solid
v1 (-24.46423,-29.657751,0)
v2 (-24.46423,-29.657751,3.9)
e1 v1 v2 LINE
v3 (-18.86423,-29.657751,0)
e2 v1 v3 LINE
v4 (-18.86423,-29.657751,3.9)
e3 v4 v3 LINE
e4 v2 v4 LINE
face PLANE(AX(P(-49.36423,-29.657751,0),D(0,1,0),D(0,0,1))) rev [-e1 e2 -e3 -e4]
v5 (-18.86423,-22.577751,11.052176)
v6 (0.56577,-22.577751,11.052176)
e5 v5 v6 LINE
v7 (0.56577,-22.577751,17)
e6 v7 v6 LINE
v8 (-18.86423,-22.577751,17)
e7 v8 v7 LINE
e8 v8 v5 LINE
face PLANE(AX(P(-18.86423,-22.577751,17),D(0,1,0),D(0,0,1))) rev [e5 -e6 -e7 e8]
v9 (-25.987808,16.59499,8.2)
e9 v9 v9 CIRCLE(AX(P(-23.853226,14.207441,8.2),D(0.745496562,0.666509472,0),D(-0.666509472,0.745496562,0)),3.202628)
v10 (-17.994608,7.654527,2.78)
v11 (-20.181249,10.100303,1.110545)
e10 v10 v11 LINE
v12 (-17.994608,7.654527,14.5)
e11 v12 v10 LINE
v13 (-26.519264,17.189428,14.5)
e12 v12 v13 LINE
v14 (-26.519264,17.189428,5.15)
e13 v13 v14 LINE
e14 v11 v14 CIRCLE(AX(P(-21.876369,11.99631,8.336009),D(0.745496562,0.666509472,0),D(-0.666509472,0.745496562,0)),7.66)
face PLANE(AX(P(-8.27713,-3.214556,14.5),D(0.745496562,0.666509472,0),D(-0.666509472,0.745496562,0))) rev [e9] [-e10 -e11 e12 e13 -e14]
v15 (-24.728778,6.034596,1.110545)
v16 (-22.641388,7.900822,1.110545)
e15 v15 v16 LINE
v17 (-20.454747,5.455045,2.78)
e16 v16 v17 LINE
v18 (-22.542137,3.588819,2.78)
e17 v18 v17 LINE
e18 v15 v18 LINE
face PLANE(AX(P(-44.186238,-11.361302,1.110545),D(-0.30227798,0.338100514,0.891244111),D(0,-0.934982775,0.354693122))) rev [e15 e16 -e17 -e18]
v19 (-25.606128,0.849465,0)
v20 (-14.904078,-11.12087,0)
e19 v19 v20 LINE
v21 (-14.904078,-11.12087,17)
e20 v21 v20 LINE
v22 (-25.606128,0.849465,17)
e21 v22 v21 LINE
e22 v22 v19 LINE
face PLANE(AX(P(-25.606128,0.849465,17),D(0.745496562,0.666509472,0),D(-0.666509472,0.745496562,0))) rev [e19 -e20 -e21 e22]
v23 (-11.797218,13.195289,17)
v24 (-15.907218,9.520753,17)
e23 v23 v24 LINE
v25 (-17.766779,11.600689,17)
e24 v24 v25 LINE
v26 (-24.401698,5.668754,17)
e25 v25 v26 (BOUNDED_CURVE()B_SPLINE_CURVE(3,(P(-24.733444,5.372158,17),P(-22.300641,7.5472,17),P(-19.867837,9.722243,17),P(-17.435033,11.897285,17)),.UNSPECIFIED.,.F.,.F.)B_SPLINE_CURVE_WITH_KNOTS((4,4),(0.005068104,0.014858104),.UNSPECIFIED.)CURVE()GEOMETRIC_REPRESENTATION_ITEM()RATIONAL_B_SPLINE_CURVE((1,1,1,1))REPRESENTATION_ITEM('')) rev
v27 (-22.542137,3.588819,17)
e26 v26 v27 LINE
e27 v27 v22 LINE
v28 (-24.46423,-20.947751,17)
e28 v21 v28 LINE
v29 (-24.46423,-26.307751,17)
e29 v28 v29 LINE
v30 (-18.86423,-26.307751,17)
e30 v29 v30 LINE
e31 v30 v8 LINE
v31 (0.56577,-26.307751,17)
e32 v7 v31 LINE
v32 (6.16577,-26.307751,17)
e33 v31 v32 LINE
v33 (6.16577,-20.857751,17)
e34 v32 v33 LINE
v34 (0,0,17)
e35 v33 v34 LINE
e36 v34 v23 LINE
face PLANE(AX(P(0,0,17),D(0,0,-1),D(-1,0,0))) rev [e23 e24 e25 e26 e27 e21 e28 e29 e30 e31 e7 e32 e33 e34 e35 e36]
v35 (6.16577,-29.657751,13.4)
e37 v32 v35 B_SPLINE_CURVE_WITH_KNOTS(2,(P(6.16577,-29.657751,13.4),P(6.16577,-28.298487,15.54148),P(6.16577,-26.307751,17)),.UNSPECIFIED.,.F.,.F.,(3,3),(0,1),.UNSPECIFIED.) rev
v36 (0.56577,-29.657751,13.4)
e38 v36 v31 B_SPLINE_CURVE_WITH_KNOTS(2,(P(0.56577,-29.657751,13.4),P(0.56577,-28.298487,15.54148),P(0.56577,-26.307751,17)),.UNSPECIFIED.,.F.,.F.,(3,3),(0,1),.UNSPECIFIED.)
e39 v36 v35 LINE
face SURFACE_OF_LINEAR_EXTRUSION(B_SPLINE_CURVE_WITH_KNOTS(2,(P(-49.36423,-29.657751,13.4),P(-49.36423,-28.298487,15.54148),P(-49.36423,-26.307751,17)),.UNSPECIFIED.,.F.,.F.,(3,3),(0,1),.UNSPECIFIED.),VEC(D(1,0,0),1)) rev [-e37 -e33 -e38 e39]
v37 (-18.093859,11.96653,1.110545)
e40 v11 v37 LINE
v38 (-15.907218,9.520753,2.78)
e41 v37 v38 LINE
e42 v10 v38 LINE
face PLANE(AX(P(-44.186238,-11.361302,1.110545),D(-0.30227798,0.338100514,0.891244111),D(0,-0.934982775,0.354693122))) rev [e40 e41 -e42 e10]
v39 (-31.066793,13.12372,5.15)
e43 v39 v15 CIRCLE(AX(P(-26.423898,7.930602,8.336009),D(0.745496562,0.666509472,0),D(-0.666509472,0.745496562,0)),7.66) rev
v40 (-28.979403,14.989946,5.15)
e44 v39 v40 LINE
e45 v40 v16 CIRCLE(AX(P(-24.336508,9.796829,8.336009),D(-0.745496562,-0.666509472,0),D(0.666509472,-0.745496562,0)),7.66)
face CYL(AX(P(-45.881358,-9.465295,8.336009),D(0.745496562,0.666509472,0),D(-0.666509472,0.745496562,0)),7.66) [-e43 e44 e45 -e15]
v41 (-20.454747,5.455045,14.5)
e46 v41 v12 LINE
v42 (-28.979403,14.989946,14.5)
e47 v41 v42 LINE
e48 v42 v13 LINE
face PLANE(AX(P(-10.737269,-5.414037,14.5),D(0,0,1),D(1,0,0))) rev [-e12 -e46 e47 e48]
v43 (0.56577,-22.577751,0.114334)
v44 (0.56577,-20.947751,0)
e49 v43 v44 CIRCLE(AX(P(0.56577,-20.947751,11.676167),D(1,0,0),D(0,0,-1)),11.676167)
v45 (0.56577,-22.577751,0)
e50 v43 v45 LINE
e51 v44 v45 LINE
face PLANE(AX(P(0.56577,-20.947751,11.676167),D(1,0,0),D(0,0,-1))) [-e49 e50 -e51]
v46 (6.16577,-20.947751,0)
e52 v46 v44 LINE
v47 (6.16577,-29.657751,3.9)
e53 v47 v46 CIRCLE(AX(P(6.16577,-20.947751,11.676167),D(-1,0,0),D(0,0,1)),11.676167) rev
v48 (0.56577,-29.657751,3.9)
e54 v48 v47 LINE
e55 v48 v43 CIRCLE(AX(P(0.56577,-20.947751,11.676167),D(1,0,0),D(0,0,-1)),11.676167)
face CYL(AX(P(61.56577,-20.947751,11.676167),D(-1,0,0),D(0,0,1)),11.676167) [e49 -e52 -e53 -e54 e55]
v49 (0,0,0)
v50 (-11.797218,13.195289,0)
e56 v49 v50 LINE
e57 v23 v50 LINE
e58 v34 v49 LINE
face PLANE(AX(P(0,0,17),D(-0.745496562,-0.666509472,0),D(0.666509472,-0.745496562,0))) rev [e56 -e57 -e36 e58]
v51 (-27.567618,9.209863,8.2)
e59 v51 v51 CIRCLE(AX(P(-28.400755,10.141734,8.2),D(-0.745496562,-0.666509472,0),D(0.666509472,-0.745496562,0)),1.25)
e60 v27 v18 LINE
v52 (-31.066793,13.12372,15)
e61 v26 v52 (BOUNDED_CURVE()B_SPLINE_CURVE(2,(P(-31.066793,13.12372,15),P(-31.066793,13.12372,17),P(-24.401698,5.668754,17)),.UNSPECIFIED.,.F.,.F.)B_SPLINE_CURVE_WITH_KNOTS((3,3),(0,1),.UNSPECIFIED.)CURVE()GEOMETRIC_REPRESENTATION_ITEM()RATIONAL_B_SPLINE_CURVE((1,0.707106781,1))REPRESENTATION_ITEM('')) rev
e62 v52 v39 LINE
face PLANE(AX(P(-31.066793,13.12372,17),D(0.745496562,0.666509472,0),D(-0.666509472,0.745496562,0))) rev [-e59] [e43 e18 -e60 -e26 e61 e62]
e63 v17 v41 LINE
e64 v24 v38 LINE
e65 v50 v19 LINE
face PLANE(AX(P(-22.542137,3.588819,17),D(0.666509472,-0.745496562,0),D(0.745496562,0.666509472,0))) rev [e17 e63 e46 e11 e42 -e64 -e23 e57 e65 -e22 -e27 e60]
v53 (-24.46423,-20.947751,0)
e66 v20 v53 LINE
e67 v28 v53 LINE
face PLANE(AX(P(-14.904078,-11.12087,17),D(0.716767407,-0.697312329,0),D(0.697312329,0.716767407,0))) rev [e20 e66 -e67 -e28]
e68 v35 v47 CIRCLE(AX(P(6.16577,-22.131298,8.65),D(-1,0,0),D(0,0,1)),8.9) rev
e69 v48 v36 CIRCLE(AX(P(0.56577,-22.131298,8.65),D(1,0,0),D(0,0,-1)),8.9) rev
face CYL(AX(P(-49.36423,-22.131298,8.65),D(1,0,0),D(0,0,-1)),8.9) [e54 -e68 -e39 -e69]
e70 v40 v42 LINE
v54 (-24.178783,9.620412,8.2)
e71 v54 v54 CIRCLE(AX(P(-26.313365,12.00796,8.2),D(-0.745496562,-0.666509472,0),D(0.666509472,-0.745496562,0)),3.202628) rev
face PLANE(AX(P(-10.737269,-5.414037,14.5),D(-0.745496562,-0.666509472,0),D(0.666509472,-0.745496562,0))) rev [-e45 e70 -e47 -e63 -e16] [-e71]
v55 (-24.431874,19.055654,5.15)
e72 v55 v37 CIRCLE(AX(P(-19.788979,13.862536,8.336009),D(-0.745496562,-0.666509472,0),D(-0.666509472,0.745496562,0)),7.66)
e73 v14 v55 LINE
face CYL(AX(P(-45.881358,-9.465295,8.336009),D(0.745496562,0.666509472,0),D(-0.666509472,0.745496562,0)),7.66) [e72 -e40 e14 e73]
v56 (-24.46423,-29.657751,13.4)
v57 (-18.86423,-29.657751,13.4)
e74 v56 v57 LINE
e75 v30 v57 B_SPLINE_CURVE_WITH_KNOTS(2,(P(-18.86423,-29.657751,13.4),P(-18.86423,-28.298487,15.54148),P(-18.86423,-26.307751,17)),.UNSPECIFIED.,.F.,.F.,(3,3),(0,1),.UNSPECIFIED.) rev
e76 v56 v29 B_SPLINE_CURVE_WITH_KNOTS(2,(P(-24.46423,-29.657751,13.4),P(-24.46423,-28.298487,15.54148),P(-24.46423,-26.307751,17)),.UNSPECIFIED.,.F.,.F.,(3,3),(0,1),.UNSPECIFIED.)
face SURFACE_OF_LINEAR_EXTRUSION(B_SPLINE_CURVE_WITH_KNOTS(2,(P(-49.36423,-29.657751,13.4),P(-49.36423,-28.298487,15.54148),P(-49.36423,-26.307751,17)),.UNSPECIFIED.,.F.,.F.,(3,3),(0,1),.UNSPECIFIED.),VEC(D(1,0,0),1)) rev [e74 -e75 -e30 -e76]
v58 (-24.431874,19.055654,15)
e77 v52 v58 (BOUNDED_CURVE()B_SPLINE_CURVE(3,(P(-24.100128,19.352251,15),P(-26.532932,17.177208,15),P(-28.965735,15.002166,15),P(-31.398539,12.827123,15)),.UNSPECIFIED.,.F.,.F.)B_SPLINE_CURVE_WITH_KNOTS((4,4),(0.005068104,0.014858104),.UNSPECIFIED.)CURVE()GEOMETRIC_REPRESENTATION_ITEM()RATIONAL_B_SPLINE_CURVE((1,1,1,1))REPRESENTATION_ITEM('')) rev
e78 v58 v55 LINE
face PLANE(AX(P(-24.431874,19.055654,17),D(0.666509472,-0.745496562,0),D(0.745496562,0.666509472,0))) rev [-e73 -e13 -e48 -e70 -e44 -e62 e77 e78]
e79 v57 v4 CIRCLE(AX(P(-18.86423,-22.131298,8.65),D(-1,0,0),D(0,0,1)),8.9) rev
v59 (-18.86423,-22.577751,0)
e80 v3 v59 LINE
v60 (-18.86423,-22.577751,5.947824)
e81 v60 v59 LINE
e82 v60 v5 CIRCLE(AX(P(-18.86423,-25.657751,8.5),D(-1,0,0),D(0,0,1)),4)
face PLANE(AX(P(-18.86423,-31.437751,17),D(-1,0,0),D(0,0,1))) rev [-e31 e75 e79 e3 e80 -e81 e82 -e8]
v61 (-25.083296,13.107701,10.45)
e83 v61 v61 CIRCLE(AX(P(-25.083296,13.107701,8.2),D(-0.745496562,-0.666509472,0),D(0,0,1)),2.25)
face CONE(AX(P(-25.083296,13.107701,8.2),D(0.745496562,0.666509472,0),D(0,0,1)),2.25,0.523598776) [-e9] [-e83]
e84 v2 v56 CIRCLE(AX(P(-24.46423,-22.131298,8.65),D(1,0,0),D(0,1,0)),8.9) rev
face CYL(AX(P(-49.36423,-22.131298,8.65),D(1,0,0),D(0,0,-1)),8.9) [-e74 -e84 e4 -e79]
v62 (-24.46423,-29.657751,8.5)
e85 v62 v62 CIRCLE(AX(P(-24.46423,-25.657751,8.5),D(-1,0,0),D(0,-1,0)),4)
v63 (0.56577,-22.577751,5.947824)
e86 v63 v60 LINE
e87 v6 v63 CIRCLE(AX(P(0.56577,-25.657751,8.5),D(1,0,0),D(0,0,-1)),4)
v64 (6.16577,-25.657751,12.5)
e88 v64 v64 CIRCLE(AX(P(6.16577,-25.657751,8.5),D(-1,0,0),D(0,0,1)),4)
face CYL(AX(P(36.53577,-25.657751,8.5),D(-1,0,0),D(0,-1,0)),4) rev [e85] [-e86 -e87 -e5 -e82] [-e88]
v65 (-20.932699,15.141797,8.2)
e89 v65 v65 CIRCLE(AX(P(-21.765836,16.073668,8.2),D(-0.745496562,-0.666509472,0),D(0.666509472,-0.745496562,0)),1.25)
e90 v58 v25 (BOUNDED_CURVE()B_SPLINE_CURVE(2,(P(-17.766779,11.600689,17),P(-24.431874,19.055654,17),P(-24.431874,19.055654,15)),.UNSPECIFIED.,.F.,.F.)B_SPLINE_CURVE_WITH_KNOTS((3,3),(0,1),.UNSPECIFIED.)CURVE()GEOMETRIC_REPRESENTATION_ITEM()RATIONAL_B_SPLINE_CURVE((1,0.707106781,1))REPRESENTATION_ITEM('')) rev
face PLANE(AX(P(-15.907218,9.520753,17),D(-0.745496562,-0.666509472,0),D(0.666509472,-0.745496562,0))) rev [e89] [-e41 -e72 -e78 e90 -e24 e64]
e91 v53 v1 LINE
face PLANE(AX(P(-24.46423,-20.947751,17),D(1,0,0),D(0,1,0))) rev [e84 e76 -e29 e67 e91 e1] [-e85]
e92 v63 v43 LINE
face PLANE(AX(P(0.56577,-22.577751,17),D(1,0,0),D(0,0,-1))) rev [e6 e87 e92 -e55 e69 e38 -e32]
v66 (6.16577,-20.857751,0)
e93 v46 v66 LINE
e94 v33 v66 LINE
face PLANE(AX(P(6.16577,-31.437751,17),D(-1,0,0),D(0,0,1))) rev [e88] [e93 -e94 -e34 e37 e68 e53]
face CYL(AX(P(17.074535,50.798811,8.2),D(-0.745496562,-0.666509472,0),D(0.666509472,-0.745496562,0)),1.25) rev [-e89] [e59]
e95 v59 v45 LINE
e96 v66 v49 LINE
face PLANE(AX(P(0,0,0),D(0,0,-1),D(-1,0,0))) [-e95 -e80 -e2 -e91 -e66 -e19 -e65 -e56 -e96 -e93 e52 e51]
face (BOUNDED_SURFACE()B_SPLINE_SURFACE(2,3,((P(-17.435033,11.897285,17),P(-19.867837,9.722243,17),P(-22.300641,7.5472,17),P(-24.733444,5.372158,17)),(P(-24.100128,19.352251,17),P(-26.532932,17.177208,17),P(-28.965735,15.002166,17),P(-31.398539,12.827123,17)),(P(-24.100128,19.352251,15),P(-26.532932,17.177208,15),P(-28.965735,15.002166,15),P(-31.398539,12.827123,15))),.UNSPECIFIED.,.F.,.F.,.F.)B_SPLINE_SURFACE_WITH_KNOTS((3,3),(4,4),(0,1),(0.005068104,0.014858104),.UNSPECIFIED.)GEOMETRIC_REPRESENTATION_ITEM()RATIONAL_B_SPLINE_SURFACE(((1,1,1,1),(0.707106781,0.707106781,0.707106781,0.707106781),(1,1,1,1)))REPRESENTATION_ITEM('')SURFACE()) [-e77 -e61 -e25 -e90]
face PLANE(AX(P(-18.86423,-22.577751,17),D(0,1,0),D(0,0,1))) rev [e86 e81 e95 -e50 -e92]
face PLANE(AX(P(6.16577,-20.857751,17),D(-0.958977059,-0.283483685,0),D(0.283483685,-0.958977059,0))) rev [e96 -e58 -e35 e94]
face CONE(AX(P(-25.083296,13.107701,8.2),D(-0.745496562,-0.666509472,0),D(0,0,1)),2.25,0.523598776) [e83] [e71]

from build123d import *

# Parameters (mm, degrees)
BOSS_EXTRUDE1_DEPTH           = 17
CUT_EXTRUDE2_DEPTH            = 35
CUT_EXTRUDE3_DEPTH            = 30.5
CUT_EXTRUDE4_DEPTH            = 61
SKETCH6_R                     = 4
CUT_EXTRUDE5_DEPTH            = 61
CUT_EXTRUDE6_START            = -12.79
SKETCH7_W                     = 3.3
SKETCH7_H                     = 14.201279548
CUT_EXTRUDE6_DEPTH            = 12.79
SKETCH8_R                     = 1.25
CUT_EXTRUDE7_DEPTH            = 61
SKETCH9_R                     = 2.25
SKETCH9_R_2                   = 1.25
EXTRUDE_THIN1_DEPTH           = 1.75
EXTRUDE_THIN1_TAPER           = -30
EXTRUDE_THIN1_OTHER_WAY_DEPTH = 1.75
EXTRUDE_THIN1_OTHER_WAY_TAPER = -30
SKETCH10_R                    = 1.25
CUT_EXTRUDE9_DEPTH            = 43.000727623
FILLET1_SIZE                  = 10
FILLET1_SIZE_2                = 2


with BuildPart() as part:
    # Sketch1 → Boss-Extrude1 (new body)
    with BuildSketch(Plane.XY):
        Polygon((0, 0), (-11.797217655, 13.195289144), (-15.907217655, 9.520753176), (-24.431873803, 19.055654202), (-31.066793203, 13.123719901), (-22.542137055, 3.588818875), (-25.606127924, 0.849464945), (-14.904077823, -11.120869896), (-24.464229858, -20.947751043), (-24.464229858, -31.437751043), (-18.864229858, -31.437751043), (-18.864229858, -22.577751043), (0.565770142, -22.577751043), (0.565770142, -31.437751043), (6.165770142, -31.437751043), (6.165770142, -20.857751043), align=None)
    extrude(amount=BOSS_EXTRUDE1_DEPTH)

    # Sketch3 → Cut-Extrude2 (cut)
    with BuildSketch(Plane(origin=(-4.11, -3.674535968, 0), x_dir=(0, 0, -1), z_dir=(0.7454965618132088, 0.6665094720442348, 0))):
        with BuildLine():
            Line((-1.11054508, 20.98073524), (-2.78, 17.7))
            Line((-2.78, 17.7), (0.68, 17.7))
            Line((0.68, 17.7), (0.68, 32.569121824))
            Line((0.68, 32.569121824), (-17, 32.569121824))
            Line((-17, 32.569121824), (-17, 30.49))
            Line((-17, 30.49), (-5.15, 30.49))
            ThreePointArc((-5.15, 30.49), (-1.285745078, 26.518907223), (-1.11054508, 20.98073524))
        make_face()
    extrude(amount=-CUT_EXTRUDE2_DEPTH, mode=Mode.SUBTRACT)

    # Sketch4 → Cut-Extrude3 (cut, symmetric)
    with BuildSketch(Plane(origin=(-18.864229858, 0, 0), x_dir=(0, 0, -1), z_dir=(1, 0, 0))):
        with BuildLine():
            Line((-17, -26.307751043), (-17, -22.577751043))
            Line((-17, -22.577751043), (-18.338911285, -22.577751043))
            Line((-18.338911285, -22.577751043), (-18.338911285, -32.309712135))
            Line((-18.338911285, -32.309712135), (1.137649959, -32.309712135))
            Line((1.137649959, -32.309712135), (1.137649959, -22.577751043))
            Line((1.137649959, -22.577751043), (0, -22.577751043))
            Line((0, -22.577751043), (0, -29.657751043))
            Line((0, -29.657751043), (-3.9, -29.657751043))
            ThreePointArc((-3.9, -29.657751043), (-8.65, -31.031297694), (-13.4, -29.657751043))
            add(Edge.make_bspline(
                [(-13.4, -29.657751043), (-15.541480272, -28.298487281), (-17, -26.307751043)],
                knots=[0, 0, 0, 1, 1, 1], degree=2))
        make_face()
    extrude(amount=CUT_EXTRUDE3_DEPTH, both=True, mode=Mode.SUBTRACT)

    # Sketch5 → Cut-Extrude4 (cut)
    with BuildSketch(Plane.ZY.offset(-0.565770142)):
        with BuildLine():
            Line((3.9, -29.657751043), (0, -29.657751043))
            Line((0, -29.657751043), (0, -20.947751043))
            ThreePointArc((0, -20.947751043), (1.01950945, -25.719388602), (3.9, -29.657751043))
        make_face()
    extrude(amount=-CUT_EXTRUDE4_DEPTH, mode=Mode.SUBTRACT)

    # Sketch6 → Cut-Extrude5 (cut)
    with BuildSketch(Plane.ZY.offset(24.464229858)):
        with Locations(Location((8.5, -25.657751043, 0), (0, 0, 270))):
            Circle(SKETCH6_R)
    extrude(amount=-CUT_EXTRUDE5_DEPTH, mode=Mode.SUBTRACT)

    # Sketch7 → Cut-Extrude6 (cut)
    with BuildSketch(Plane(origin=(-20.321873803, 22.73019017, 0), x_dir=(0.7454965618132092, 0.6665094720442343, 0), z_dir=(-0.6665094720442343, 0.7454965618132092, 0)).offset(CUT_EXTRUDE6_START)):
        with Locations((-9.963103897, -7.399360226)):
            Rectangle(SKETCH7_W, SKETCH7_H)
    extrude(amount=CUT_EXTRUDE6_DEPTH, mode=Mode.SUBTRACT)

    # Sketch8 → Cut-Extrude7 (cut)
    with BuildSketch(Plane(origin=(-10.7449194, -9.606470269, 0), x_dir=(0, 0, 1), z_dir=(-0.7454965618132091, -0.6665094720442345, 0))):
        with Locations(Location((8.2, 26.49, 0), (0, 0, 270))):
            Circle(SKETCH8_R)
    extrude(amount=-CUT_EXTRUDE7_DEPTH, mode=Mode.SUBTRACT)

    # Sketch9 → Extrude-Thin1 (add)
    with BuildSketch(Plane(origin=(-7.4274597, -6.640503118, 0), x_dir=(0, 0, 1), z_dir=(-0.7454965618132092, -0.6665094720442343, 0))):
        with Locations((8.2, 26.49)):
            Circle(SKETCH9_R)
        with Locations((8.2, 26.49)):
            Circle(SKETCH9_R_2, mode=Mode.SUBTRACT)
    extrude(amount=EXTRUDE_THIN1_DEPTH, taper=EXTRUDE_THIN1_TAPER)

    # Sketch9 → Extrude-Thin1 other way (add)
    with BuildSketch(Plane(origin=(-7.4274597, -6.640503118, 0), x_dir=(0, 0, 1), z_dir=(-0.7454965618132092, -0.6665094720442343, 0))):
        with Locations((8.2, 26.49)):
            Circle(SKETCH9_R)
        with Locations((8.2, 26.49)):
            Circle(SKETCH9_R_2, mode=Mode.SUBTRACT)
    extrude(amount=-EXTRUDE_THIN1_OTHER_WAY_DEPTH, taper=EXTRUDE_THIN1_OTHER_WAY_TAPER)

    # Sketch10 → Cut-Extrude9 (cut, through all)
    with BuildSketch(Plane(origin=(-4.11, -3.674535968, 0), x_dir=(0, 0, -1), z_dir=(0.7454965618132088, 0.6665094720442348, 0))):
        with Locations(Location((-8.2, 26.49, 0), (0, 0, 270))):
            Circle(SKETCH10_R)
    extrude(amount=-CUT_EXTRUDE9_DEPTH, mode=Mode.SUBTRACT)

    # Fillet1
    # an asymmetric fillet: 10, 2 mm, written as the material it takes off along each edge
    with BuildSketch(Plane(origin=(-5.794459757, 35.718391003, 17), x_dir=(0.6665094720442343, -0.7454965618132092, 0), z_dir=(-0.7454965618132092, -0.6665094720442343, 0))) as fillet1_piece_1:
        with BuildLine():
            Bezier((FILLET1_SIZE, 0), (0, 0), (0, -FILLET1_SIZE_2), weights=[1, 0.707106781, 1])
            Line((0, -FILLET1_SIZE_2), (0, 0))
            Line((0, 0), (FILLET1_SIZE, 0))
        make_face()
    extrude(amount=58.9, mode=Mode.SUBTRACT)


solid = part.part
